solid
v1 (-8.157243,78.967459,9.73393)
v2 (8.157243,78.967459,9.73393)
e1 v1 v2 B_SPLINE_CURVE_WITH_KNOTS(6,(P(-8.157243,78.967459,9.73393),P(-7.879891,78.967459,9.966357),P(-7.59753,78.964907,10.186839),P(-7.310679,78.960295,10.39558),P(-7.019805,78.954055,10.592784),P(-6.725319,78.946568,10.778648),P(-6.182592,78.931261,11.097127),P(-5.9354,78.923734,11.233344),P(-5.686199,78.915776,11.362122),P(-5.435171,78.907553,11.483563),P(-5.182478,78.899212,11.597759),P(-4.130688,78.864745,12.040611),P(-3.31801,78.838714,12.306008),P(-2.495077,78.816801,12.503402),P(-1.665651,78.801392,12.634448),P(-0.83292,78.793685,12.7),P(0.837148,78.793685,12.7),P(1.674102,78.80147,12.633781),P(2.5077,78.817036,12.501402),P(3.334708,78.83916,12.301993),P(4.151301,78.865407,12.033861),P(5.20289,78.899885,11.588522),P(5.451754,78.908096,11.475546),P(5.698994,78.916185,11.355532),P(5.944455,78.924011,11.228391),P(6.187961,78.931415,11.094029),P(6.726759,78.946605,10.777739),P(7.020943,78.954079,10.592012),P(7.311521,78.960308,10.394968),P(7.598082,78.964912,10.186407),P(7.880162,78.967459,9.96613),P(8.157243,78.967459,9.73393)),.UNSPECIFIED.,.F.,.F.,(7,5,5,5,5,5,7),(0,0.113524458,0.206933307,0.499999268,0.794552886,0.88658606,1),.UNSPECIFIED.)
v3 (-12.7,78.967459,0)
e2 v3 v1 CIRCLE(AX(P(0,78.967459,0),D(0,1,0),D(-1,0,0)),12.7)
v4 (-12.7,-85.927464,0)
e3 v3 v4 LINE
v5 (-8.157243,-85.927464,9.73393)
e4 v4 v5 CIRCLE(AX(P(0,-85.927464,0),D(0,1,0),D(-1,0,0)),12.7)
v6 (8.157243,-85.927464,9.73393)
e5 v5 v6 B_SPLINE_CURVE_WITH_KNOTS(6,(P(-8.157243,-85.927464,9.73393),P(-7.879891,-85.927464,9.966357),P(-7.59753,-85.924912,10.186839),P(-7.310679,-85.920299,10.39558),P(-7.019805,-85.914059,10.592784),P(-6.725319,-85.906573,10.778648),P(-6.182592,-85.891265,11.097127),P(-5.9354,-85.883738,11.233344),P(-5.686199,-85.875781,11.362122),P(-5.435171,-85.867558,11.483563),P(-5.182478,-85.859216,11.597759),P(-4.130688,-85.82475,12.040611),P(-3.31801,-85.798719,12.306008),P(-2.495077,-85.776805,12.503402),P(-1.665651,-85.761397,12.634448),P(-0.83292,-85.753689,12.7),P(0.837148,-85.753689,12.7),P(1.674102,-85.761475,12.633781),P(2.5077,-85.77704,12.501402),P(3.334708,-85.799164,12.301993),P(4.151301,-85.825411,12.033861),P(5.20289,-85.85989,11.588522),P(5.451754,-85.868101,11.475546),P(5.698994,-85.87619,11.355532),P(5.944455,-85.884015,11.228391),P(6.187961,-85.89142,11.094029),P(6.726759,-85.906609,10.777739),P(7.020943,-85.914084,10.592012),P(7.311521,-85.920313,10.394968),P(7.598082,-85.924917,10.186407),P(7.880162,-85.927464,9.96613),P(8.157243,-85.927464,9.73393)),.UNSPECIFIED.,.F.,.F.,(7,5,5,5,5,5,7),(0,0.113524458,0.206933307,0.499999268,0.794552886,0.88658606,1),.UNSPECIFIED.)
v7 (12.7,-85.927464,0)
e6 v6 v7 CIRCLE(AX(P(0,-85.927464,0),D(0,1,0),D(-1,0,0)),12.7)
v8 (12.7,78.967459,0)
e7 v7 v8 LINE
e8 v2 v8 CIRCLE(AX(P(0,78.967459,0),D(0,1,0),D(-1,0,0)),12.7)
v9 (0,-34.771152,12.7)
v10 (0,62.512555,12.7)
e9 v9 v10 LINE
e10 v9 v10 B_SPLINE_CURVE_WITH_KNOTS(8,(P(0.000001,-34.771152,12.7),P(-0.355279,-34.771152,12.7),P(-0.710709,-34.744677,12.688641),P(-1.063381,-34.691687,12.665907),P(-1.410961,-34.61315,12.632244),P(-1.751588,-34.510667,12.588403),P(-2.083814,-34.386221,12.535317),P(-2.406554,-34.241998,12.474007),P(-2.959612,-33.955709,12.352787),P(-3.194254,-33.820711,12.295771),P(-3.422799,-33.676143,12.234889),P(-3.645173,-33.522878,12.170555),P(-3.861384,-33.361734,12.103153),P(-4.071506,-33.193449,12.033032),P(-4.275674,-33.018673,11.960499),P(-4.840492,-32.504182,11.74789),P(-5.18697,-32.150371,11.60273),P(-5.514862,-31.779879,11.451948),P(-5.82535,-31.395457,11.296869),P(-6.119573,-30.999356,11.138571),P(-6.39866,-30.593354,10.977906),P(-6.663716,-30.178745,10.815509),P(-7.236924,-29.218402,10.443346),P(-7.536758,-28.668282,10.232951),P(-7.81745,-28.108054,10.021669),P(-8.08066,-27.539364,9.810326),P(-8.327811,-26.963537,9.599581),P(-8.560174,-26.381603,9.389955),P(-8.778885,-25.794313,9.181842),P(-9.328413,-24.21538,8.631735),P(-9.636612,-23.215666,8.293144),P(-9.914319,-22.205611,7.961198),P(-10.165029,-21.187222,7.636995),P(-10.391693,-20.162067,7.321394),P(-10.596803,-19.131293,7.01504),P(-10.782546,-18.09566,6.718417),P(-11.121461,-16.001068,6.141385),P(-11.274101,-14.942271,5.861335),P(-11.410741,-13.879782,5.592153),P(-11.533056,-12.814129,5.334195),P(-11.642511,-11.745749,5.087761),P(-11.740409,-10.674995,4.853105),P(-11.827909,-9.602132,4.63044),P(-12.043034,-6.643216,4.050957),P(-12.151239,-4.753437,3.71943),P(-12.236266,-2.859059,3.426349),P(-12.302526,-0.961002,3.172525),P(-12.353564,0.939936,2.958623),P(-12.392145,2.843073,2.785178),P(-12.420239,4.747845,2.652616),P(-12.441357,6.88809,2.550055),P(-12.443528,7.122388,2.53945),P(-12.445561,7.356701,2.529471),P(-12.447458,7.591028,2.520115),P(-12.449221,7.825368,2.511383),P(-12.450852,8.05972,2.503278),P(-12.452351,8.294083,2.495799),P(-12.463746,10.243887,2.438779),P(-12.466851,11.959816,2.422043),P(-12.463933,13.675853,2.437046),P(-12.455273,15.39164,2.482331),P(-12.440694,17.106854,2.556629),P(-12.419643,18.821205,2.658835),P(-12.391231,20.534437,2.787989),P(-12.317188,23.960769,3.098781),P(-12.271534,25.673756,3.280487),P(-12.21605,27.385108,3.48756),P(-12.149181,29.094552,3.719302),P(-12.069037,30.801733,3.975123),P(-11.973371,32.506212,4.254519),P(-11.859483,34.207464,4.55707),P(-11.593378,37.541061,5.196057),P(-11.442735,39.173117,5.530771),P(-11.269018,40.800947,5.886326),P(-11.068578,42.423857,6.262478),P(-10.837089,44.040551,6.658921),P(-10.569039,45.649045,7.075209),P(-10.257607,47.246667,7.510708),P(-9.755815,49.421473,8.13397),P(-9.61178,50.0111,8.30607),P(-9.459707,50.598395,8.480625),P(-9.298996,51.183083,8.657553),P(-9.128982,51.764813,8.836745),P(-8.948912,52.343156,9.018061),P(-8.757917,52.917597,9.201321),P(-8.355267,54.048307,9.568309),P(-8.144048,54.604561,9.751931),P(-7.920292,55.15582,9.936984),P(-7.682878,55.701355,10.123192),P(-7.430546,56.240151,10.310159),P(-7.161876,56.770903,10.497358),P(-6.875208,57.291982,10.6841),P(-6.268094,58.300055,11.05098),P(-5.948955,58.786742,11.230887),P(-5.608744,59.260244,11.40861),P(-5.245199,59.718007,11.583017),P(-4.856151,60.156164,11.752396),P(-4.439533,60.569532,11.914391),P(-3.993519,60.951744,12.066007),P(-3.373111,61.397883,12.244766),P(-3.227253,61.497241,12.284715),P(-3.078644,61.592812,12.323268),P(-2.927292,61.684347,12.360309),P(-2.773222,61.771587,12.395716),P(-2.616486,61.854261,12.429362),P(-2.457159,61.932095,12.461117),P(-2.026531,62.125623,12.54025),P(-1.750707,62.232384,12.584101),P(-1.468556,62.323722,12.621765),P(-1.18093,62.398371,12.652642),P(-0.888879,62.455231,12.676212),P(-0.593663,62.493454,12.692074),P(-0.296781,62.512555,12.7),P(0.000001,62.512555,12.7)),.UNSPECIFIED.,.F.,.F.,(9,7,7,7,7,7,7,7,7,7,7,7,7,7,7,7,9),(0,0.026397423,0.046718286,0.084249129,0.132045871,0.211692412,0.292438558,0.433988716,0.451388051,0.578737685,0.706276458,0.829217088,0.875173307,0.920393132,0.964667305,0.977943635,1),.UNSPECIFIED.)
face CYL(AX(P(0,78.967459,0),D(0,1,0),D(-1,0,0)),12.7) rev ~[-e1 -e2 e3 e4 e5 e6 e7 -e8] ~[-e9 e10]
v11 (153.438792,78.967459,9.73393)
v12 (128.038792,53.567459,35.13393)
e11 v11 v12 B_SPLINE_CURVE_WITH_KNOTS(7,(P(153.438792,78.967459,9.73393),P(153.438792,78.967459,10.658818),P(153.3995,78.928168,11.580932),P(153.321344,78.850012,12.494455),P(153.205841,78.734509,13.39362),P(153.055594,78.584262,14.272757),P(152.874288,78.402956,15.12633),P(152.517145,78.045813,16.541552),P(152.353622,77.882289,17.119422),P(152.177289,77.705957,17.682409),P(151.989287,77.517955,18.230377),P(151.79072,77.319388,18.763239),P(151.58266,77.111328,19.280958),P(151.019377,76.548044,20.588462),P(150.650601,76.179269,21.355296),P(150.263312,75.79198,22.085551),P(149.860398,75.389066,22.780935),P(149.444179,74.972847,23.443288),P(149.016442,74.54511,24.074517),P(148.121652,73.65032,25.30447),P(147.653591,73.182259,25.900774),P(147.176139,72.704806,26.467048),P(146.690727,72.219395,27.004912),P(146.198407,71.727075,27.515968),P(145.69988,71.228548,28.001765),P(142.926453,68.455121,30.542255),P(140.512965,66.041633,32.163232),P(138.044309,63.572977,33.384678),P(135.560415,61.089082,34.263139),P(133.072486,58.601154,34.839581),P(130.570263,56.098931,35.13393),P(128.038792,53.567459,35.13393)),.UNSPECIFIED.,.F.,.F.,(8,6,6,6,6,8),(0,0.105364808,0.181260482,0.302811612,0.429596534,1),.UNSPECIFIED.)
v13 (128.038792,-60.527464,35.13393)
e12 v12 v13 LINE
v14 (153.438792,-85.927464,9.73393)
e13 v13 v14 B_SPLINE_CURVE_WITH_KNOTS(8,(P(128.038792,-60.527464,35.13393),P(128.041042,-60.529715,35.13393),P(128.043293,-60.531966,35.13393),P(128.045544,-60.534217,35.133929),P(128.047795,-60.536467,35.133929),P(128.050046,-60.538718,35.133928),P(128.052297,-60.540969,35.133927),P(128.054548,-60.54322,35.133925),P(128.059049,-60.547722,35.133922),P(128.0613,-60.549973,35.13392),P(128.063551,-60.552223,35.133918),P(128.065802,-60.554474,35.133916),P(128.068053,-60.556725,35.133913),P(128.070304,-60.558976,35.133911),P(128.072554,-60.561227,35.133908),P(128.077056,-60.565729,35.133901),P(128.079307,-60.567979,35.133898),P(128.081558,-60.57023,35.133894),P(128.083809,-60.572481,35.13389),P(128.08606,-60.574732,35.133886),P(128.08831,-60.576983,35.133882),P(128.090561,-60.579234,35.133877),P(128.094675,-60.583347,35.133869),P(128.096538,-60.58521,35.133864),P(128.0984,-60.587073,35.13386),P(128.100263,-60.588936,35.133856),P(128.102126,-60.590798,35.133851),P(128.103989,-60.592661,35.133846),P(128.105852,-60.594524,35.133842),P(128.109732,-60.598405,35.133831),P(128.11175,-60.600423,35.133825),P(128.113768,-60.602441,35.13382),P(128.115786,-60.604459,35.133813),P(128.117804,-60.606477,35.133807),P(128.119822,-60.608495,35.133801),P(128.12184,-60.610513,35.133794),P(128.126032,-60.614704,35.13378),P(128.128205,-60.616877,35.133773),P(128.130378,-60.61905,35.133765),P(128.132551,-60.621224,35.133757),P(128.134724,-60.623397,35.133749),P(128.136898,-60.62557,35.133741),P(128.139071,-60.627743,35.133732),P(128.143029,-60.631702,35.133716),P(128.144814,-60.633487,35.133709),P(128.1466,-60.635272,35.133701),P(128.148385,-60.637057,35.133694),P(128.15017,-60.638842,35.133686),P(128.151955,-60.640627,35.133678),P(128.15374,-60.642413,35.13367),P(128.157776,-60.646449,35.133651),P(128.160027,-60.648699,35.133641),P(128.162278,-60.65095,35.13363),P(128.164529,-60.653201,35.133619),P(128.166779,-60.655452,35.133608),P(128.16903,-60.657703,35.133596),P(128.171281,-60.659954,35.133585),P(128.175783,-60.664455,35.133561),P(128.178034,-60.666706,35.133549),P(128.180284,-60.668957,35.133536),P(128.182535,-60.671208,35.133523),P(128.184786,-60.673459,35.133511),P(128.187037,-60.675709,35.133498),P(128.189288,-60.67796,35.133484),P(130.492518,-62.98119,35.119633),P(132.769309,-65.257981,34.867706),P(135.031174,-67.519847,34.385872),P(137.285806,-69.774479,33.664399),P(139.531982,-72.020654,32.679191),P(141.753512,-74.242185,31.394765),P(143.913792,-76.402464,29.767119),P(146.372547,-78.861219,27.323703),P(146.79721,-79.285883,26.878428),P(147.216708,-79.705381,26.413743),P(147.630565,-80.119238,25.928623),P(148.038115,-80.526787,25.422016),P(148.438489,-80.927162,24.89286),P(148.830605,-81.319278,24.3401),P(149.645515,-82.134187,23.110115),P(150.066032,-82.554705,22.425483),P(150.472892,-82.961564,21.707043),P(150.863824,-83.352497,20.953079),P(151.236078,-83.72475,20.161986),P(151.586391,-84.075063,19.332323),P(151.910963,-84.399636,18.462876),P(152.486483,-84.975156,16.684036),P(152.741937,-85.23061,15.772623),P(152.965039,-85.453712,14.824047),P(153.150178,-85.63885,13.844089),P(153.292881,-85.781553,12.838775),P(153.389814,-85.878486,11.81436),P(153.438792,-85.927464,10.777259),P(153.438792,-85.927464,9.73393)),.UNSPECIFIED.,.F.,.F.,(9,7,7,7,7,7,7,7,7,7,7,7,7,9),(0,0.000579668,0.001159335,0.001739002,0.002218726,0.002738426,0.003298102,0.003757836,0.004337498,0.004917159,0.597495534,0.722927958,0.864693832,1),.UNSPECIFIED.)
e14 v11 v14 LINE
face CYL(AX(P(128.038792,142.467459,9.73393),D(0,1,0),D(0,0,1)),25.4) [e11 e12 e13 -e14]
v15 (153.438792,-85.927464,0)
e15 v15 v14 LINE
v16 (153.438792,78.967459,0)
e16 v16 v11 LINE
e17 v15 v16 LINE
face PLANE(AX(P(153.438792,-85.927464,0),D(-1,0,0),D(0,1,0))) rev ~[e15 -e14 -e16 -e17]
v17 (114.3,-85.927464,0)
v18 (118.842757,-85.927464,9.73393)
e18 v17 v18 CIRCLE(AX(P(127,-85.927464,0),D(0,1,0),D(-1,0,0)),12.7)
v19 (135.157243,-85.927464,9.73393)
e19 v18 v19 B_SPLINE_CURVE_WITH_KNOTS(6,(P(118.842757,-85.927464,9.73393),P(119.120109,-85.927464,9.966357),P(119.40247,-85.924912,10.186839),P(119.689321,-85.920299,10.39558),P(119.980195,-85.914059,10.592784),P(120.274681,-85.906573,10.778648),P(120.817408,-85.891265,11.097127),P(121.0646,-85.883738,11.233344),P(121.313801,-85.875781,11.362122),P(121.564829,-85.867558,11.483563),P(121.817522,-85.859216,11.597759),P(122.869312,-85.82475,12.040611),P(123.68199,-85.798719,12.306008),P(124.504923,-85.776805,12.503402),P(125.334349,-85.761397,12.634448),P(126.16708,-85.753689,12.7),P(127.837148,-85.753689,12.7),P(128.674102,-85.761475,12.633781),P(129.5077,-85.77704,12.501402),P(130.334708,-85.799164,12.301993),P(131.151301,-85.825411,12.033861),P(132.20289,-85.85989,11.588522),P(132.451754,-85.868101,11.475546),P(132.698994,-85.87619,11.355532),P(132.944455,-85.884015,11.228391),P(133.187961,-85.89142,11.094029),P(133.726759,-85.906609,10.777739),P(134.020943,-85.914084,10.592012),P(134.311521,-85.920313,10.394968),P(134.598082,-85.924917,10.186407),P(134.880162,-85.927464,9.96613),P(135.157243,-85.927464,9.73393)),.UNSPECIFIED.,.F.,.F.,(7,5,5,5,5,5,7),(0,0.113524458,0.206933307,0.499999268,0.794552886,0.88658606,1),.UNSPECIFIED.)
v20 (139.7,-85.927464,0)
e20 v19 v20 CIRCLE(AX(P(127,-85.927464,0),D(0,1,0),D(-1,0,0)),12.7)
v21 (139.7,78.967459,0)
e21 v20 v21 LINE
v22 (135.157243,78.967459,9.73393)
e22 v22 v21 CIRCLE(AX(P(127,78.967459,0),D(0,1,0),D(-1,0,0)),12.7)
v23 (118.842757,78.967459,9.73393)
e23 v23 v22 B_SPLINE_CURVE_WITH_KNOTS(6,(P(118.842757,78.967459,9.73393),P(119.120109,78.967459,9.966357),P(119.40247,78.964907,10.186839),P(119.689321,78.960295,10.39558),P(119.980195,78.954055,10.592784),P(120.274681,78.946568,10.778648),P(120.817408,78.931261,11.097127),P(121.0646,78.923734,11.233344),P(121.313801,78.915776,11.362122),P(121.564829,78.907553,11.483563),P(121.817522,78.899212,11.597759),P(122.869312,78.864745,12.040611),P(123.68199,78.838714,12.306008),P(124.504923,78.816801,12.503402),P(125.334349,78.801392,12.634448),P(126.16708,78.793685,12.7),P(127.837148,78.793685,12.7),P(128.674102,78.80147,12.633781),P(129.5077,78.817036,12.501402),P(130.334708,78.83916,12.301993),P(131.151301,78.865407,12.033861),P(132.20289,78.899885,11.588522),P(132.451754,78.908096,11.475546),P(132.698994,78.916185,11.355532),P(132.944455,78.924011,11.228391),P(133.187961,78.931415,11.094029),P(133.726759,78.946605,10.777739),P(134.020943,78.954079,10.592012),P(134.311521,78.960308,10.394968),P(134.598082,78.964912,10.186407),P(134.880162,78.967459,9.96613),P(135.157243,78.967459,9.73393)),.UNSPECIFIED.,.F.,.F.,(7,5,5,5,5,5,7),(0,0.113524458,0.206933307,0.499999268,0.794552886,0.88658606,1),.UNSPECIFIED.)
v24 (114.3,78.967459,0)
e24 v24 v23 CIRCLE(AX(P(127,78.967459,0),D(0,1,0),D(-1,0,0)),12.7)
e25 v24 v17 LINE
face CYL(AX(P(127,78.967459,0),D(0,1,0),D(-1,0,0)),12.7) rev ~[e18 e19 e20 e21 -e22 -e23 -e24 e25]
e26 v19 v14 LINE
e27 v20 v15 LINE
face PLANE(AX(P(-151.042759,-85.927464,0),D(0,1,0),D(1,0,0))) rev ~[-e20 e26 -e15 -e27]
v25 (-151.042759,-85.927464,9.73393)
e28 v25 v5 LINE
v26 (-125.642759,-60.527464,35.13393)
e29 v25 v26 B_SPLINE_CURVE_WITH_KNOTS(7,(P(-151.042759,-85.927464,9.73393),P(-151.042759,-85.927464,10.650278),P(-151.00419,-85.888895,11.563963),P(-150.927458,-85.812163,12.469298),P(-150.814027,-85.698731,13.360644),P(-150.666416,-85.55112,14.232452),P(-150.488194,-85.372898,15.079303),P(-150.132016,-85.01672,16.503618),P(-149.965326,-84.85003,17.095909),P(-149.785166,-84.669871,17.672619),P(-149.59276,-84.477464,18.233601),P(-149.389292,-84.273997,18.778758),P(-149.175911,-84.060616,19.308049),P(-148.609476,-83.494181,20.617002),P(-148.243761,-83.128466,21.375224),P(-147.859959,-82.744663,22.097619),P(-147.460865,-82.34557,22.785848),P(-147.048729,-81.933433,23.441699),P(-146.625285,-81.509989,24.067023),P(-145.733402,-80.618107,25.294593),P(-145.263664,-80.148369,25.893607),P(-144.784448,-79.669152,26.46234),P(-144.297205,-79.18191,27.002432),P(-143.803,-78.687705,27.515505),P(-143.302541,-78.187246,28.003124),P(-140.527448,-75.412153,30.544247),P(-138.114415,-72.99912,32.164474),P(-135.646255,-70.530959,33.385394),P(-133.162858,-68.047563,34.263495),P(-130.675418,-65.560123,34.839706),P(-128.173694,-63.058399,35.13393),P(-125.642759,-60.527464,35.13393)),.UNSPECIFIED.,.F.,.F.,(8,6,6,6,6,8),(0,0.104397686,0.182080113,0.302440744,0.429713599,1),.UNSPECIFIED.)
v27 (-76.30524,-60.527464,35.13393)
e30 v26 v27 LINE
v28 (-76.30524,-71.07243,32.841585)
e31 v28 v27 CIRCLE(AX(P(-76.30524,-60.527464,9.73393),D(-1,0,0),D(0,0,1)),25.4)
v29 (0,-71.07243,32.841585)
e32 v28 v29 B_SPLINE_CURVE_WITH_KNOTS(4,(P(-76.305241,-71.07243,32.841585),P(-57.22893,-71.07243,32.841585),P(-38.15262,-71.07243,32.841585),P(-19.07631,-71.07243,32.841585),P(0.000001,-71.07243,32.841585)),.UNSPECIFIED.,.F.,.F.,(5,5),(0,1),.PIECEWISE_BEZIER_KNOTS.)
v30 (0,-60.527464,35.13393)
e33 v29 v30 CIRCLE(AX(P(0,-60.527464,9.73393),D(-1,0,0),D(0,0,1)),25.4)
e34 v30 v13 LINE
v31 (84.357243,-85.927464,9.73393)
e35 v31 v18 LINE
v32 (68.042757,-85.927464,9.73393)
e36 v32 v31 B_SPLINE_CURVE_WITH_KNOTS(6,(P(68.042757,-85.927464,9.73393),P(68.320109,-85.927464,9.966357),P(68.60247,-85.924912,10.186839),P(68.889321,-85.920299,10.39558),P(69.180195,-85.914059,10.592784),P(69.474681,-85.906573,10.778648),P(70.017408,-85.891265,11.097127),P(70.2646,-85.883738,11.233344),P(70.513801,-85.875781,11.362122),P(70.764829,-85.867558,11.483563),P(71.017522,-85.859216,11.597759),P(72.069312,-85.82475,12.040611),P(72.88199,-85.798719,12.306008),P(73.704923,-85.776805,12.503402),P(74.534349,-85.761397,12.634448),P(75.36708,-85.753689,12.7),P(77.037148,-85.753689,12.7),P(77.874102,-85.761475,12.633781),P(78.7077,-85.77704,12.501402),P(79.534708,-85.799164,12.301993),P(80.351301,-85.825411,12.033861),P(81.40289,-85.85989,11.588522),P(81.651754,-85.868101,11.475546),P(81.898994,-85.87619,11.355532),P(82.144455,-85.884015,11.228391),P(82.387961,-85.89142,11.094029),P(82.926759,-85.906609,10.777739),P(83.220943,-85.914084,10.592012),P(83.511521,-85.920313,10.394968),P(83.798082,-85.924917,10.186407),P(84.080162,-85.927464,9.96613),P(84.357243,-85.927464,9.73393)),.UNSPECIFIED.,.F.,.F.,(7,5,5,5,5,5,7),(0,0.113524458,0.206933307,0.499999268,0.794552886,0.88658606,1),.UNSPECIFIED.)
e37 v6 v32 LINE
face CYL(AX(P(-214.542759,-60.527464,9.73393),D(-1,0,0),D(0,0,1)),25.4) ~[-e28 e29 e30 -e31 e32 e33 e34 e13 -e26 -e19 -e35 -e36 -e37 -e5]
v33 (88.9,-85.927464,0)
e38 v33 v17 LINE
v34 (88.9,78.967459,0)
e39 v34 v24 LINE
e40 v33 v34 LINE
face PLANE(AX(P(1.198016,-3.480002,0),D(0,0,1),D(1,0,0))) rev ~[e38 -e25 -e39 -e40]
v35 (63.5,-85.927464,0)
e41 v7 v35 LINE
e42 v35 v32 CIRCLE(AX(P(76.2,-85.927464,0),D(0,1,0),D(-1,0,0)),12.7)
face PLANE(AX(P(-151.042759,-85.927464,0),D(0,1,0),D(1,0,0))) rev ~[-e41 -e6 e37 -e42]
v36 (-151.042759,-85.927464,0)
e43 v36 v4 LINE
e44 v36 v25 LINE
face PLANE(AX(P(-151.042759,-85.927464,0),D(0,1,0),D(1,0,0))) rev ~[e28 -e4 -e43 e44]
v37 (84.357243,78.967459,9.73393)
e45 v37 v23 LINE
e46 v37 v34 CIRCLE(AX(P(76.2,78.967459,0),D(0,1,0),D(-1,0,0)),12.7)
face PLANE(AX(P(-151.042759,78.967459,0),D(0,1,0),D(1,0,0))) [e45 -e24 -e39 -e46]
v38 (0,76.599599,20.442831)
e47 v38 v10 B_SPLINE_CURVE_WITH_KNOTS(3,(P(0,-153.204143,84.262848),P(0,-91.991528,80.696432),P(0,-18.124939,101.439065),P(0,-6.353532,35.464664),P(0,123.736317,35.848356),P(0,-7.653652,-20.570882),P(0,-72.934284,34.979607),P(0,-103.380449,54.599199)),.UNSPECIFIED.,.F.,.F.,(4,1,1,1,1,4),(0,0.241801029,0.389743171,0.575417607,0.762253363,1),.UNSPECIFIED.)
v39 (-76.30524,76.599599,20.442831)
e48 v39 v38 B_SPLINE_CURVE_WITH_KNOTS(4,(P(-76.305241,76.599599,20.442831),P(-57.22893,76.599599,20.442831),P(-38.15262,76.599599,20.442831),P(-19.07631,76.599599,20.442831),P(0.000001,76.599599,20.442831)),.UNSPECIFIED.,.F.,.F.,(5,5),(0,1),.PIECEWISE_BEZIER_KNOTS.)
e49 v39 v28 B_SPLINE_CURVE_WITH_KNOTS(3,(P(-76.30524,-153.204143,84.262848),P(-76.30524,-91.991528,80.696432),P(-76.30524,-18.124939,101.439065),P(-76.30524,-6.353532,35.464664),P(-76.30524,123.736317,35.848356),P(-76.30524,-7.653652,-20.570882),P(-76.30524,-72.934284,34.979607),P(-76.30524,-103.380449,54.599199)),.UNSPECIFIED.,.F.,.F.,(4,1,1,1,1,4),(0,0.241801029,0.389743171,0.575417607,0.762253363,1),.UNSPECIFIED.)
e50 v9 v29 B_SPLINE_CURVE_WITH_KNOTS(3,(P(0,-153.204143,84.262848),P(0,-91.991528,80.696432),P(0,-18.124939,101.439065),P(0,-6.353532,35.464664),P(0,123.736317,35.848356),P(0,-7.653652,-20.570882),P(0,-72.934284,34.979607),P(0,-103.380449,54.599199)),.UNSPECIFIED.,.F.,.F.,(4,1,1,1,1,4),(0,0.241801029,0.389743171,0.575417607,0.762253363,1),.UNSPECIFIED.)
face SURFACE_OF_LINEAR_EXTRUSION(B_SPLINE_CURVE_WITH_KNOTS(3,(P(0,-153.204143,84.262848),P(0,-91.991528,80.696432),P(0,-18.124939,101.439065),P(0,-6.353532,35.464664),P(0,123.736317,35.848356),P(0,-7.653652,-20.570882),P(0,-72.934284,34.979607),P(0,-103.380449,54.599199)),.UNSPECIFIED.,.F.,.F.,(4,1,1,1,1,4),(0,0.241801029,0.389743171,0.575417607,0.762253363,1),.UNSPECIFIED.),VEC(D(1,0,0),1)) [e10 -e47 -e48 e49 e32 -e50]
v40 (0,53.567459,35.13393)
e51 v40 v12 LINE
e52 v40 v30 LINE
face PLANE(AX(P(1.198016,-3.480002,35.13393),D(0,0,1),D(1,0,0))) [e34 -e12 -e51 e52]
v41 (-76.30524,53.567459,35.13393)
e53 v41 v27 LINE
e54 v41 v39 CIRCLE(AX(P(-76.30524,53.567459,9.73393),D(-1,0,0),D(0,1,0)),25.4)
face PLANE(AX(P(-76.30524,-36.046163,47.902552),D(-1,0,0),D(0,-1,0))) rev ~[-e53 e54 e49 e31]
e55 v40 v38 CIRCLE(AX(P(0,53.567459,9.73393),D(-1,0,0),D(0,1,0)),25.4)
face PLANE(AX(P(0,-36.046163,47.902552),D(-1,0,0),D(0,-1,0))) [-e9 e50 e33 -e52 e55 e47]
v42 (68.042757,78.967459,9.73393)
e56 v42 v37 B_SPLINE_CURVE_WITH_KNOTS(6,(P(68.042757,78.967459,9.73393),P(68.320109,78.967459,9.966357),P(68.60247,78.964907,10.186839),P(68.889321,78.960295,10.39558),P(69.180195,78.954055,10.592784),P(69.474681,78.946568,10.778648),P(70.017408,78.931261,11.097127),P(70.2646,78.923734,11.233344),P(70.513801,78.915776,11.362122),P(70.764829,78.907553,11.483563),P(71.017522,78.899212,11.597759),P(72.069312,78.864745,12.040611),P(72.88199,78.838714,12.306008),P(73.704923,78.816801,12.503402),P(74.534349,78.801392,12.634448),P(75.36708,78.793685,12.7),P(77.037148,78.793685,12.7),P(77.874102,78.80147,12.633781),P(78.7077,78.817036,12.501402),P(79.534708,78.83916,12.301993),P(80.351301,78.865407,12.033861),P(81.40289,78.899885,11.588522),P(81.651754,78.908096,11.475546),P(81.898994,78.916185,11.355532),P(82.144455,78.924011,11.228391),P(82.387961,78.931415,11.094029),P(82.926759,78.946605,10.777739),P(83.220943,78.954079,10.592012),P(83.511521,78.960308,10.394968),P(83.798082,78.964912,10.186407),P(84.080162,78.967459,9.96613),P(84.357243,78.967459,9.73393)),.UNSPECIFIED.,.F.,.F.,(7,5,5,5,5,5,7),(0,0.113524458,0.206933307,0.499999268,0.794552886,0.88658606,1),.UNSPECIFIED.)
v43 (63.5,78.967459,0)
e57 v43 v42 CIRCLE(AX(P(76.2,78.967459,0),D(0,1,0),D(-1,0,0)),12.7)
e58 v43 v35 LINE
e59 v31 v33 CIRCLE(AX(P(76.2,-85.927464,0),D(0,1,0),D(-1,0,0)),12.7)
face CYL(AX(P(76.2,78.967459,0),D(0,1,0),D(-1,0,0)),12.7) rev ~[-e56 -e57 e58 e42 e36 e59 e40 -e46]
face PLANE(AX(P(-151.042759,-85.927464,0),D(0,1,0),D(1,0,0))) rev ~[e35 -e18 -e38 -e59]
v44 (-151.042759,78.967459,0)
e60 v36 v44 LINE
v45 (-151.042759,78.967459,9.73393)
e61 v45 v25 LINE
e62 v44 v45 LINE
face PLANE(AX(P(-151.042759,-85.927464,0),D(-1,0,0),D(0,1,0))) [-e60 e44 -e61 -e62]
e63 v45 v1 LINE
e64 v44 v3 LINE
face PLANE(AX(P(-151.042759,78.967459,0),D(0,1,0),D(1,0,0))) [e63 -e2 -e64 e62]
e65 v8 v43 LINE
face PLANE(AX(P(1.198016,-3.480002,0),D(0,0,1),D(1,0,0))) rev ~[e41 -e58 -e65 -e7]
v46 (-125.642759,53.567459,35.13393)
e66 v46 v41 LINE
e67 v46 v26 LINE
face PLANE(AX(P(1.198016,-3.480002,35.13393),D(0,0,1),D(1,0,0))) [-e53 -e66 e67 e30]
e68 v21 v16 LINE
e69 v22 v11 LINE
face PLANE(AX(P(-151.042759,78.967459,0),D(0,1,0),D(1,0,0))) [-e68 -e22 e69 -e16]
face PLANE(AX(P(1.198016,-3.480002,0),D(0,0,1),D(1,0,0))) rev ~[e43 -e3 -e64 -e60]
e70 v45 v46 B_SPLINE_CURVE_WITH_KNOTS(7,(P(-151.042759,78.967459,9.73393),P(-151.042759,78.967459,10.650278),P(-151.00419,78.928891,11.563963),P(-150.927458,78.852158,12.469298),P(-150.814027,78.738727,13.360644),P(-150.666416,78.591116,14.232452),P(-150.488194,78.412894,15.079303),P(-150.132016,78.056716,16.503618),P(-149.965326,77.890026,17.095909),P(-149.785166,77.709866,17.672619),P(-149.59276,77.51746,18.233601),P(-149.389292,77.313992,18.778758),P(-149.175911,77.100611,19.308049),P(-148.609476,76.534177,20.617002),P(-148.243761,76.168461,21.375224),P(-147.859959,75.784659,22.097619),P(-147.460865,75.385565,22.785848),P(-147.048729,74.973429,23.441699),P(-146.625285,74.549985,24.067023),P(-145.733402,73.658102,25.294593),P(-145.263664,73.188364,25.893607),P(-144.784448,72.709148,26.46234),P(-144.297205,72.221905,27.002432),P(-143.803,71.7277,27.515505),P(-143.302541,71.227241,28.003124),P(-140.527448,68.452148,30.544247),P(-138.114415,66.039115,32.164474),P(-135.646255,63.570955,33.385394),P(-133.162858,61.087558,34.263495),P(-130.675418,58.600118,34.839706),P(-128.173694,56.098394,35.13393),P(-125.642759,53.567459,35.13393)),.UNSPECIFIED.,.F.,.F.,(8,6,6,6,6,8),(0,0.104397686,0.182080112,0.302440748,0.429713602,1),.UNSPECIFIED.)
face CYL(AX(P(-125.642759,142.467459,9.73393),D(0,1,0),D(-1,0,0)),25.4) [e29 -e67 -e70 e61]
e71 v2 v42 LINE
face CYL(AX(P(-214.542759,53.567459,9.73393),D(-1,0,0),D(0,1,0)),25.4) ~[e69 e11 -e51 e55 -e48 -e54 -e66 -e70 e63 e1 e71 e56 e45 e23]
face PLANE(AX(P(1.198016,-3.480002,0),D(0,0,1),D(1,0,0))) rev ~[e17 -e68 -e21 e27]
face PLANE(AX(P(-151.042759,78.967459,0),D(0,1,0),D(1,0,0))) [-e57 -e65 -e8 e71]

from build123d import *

# Parameters (mm, degrees)
F0_W        = 304.4815510511
F0_H        = 164.8949235678
F1_DEPTH    = 35.13393
F3_DEPTH    = 76.30524
F4_R        = 12.7
F5_DEPTH    = 164.8959236678
F6_T1_DEPTH = 291.8949235678
F6_T3_DEPTH = 431.4815510511


# Not quite as in the source:
# - a fillet or chamfer that OpenCascade refuses, or shapes differently, is made with other operations: its cross-section is extruded or revolved along the edge and cut away or added


with BuildPart() as f1:
    # F0 (on Top) → F1 (new body)
    with BuildSketch(Plane.XY):
        with Locations((1.1980161071, -3.480002284)):
            Rectangle(F0_W, F0_H)
    extrude(amount=F1_DEPTH)

    # F2 (on Right) → F3 (cut)
    with BuildSketch(Plane.YZ):
        with BuildLine():
            add(Edge.make_bspline(
                [(-153.2041430473, 84.2628479004), (-91.991528101, 80.6964321278), (-18.1249389438, 101.4390649478), (-6.3535316821, 35.464664407), (123.7363166686, 35.8483556733), (-7.6536515228, -20.5708818303), (-72.9342844873, 34.9796073045), (-103.3804491162, 54.5991994441)],
                knots=[0, 0, 0, 0, 0.2418010288, 0.3897431708, 0.5754176067, 0.7622533627, 1, 1, 1, 1], degree=3))
            add(Edge.make_bspline(
                [(-153.2041430473, 84.2628479004), (-136.2230330706, 76.9635861119), (-120.361559093, 61.8984612326), (-103.3804491162, 54.5991994441)],
                knots=[0, 0, 0, 0, 57.985623362, 57.985623362, 57.985623362, 57.985623362], degree=3))
        make_face()
    extrude(amount=-F3_DEPTH, mode=Mode.SUBTRACT)

    # F4 (on face) → F5 (cut, through all)
    with BuildSketch(Plane(origin=(0, 78.9674594998, 0), x_dir=(-1, 0, 0), z_dir=(0, 1, 0))):
        with Locations((-127, 0)):
            Circle(F4_R)
        with Locations((-76.2, 0)):
            Circle(F4_R)
        Circle(F4_R)
    extrude(amount=-F5_DEPTH, mode=Mode.SUBTRACT)

    # F6: fillet of radius 25.4 on 4 edges, made by hand

    # F6_s2 → F6_t1 (cut)
    with BuildSketch(Plane.XZ.offset(-142.4674594998)):
        with BuildLine():
            ThreePointArc((128.0387916327, 35.13393), (145.9993038748, 27.6944422421), (153.4387916327, 9.73393))
            Line((153.4387916327, 9.73393), (153.4387916327, 35.13393))
            Line((153.4387916327, 35.13393), (128.0387916327, 35.13393))
        make_face()
        with BuildLine():
            ThreePointArc((-151.0427594185, 9.73393), (-143.6032716606, 27.6944422421), (-125.6427594185, 35.13393))
            Line((-125.6427594185, 35.13393), (-151.0427594185, 35.13393))
            Line((-151.0427594185, 35.13393), (-151.0427594185, 9.73393))
        make_face()
    extrude(amount=F6_T1_DEPTH, mode=Mode.SUBTRACT)

    # F6_s4 → F6_t3 (cut)
    with BuildSketch(Plane.YZ.offset(-214.5427594185)):
        with BuildLine():
            ThreePointArc((78.9674594998, 9.73393), (71.527971742, 27.6944422421), (53.5674594998, 35.13393))
            Line((53.5674594998, 35.13393), (78.9674594998, 35.13393))
            Line((78.9674594998, 35.13393), (78.9674594998, 9.73393))
        make_face()
        with BuildLine():
            ThreePointArc((-60.5274640679, 35.13393), (-78.4879763101, 27.6944422421), (-85.9274640679, 9.73393))
            Line((-85.9274640679, 9.73393), (-85.9274640679, 35.13393))
            Line((-85.9274640679, 35.13393), (-60.5274640679, 35.13393))
        make_face()
    extrude(amount=F6_T3_DEPTH, mode=Mode.SUBTRACT)


solid = f1.part
